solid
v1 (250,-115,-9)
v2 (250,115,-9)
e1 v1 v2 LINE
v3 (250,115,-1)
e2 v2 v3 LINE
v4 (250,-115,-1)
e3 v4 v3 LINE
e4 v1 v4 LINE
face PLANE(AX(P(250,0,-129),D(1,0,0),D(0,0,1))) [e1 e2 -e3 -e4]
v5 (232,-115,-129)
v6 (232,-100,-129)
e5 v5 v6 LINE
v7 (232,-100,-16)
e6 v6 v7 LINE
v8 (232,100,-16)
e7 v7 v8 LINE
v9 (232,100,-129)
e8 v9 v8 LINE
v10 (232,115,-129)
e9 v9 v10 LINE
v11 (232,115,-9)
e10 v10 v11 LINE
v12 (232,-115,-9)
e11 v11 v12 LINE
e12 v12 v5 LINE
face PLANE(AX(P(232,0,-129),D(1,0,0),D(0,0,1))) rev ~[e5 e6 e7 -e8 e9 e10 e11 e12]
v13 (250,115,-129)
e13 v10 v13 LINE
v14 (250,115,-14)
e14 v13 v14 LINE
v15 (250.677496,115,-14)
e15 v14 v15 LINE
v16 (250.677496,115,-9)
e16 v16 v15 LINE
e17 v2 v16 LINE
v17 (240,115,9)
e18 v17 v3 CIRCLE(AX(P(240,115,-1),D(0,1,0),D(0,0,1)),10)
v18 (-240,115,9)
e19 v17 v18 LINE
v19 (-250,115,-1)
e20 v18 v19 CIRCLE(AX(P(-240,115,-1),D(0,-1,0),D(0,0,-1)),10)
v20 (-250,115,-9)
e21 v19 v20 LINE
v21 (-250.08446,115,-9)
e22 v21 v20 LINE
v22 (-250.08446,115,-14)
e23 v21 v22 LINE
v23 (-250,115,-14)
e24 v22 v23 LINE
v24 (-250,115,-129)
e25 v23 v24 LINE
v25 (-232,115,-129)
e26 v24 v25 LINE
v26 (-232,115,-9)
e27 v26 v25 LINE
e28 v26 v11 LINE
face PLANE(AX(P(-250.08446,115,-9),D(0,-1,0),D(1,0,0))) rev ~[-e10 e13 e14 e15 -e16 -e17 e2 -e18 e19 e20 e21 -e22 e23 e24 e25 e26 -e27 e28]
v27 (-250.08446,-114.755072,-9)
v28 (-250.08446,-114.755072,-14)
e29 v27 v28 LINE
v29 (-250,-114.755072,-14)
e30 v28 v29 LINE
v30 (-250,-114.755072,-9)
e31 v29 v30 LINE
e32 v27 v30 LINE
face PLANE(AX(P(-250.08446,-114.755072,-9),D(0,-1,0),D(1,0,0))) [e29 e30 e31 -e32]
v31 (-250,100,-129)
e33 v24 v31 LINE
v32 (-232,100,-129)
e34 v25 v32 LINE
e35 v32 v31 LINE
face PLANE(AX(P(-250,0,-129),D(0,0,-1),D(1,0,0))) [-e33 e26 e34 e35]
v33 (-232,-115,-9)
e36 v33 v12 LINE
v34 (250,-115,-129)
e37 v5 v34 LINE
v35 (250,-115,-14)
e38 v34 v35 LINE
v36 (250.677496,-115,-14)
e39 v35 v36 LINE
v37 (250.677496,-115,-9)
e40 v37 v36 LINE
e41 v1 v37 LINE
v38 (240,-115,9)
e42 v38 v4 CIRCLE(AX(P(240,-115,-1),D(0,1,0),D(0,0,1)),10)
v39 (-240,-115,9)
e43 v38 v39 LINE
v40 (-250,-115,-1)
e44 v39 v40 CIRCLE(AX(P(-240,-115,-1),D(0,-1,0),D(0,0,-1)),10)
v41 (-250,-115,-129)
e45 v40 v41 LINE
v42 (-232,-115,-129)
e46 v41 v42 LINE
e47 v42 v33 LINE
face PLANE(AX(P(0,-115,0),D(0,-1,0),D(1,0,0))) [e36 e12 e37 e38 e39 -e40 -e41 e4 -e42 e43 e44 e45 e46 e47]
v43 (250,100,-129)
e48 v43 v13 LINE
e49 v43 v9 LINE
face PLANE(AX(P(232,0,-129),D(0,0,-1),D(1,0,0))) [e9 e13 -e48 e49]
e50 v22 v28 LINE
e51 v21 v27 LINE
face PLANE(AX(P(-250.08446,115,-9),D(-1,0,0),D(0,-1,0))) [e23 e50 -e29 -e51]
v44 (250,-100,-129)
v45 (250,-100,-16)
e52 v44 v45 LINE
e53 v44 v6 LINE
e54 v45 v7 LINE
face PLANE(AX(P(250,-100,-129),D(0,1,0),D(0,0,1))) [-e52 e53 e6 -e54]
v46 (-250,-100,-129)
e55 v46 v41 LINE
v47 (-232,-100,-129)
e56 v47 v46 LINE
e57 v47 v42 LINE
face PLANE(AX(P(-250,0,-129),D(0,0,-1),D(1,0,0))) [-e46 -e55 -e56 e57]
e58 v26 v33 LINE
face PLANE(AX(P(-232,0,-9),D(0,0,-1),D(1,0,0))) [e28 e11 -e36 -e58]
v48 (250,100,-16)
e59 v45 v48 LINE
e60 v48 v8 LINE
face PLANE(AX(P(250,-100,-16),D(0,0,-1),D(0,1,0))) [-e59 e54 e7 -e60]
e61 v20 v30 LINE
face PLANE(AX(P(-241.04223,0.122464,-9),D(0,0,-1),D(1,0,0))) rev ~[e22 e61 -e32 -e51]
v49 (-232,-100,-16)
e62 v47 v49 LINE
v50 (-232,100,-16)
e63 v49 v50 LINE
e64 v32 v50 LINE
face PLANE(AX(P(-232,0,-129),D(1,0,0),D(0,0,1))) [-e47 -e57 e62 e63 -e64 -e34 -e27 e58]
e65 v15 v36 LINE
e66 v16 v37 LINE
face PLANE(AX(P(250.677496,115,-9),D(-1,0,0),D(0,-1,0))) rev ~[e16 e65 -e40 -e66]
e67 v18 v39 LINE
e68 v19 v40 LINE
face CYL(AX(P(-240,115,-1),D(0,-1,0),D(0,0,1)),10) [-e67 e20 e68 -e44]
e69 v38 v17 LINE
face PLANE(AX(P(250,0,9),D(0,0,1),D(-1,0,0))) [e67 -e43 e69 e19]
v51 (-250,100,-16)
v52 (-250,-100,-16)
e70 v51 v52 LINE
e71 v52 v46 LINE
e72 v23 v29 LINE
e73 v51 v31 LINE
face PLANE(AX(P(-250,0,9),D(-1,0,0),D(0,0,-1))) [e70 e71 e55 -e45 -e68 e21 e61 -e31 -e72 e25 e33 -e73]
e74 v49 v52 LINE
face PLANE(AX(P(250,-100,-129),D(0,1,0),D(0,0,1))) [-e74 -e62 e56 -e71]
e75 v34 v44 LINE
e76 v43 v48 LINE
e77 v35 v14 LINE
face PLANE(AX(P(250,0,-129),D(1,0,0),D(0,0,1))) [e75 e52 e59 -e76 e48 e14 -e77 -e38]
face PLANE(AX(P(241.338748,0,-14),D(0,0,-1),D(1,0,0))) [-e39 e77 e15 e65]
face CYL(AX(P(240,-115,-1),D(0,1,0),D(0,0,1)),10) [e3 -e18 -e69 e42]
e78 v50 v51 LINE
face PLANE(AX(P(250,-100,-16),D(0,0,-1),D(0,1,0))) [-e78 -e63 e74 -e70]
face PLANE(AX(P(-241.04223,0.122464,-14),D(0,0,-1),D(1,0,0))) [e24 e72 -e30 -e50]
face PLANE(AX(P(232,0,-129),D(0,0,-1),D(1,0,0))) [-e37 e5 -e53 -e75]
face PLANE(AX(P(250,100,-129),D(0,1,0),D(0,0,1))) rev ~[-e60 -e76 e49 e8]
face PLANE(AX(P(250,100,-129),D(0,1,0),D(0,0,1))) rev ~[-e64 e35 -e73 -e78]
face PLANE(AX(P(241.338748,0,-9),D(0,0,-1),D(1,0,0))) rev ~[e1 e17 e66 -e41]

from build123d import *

# Parameters (mm, degrees)
F0_W     = 18
F0_H     = 120
F1_DEPTH = 115
F2_R     = 10
F3_W     = 200
F3_H     = 113
F4_DEPTH = 500.001
F5_W     = 18.0844597816
F5_H     = 229.7550716996
F5_W_2   = 18.6774961948
F5_H_2   = 230
F6_DEPTH = 5


with BuildPart() as f1:
    # F0 (on Front) → F1 (new body, symmetric)
    with BuildSketch(Plane.XZ):
        Polygon((250, 9), (-250, 9), (-250, -9), (-232, -9), (232, -9), (250, -9), align=None)
        with Locations((-241, -69)):
            Rectangle(F0_W, F0_H)
        with Locations((241, -69)):
            Rectangle(F0_W, F0_H)
    extrude(amount=F1_DEPTH, both=True)

    # F2
    f2_edges = [f1.edges().sort_by_distance(p)[0] for p in [
        (-250, 0, 9),
        (250, 0, 9),
    ]]
    fillet(f2_edges, radius=F2_R)

    # F3 (on face) → F4 (cut, through all)
    with BuildSketch(Plane.YZ.offset(250)):
        with Locations((0, -72.5)):
            Rectangle(F3_W, F3_H)
    extrude(amount=-F4_DEPTH, mode=Mode.SUBTRACT)

    # F5 (on face) → F6 (join)
    with BuildSketch(Plane(origin=(0, 0, -9), x_dir=(1, 0, 0), z_dir=(0, 0, -1))):
        with Locations((-241.0422298908, -0.1224641502)):
            Rectangle(F5_W, F5_H)
        with Locations((241.3387480974, 0)):
            Rectangle(F5_W_2, F5_H_2)
    extrude(amount=F6_DEPTH)


solid = f1.part
